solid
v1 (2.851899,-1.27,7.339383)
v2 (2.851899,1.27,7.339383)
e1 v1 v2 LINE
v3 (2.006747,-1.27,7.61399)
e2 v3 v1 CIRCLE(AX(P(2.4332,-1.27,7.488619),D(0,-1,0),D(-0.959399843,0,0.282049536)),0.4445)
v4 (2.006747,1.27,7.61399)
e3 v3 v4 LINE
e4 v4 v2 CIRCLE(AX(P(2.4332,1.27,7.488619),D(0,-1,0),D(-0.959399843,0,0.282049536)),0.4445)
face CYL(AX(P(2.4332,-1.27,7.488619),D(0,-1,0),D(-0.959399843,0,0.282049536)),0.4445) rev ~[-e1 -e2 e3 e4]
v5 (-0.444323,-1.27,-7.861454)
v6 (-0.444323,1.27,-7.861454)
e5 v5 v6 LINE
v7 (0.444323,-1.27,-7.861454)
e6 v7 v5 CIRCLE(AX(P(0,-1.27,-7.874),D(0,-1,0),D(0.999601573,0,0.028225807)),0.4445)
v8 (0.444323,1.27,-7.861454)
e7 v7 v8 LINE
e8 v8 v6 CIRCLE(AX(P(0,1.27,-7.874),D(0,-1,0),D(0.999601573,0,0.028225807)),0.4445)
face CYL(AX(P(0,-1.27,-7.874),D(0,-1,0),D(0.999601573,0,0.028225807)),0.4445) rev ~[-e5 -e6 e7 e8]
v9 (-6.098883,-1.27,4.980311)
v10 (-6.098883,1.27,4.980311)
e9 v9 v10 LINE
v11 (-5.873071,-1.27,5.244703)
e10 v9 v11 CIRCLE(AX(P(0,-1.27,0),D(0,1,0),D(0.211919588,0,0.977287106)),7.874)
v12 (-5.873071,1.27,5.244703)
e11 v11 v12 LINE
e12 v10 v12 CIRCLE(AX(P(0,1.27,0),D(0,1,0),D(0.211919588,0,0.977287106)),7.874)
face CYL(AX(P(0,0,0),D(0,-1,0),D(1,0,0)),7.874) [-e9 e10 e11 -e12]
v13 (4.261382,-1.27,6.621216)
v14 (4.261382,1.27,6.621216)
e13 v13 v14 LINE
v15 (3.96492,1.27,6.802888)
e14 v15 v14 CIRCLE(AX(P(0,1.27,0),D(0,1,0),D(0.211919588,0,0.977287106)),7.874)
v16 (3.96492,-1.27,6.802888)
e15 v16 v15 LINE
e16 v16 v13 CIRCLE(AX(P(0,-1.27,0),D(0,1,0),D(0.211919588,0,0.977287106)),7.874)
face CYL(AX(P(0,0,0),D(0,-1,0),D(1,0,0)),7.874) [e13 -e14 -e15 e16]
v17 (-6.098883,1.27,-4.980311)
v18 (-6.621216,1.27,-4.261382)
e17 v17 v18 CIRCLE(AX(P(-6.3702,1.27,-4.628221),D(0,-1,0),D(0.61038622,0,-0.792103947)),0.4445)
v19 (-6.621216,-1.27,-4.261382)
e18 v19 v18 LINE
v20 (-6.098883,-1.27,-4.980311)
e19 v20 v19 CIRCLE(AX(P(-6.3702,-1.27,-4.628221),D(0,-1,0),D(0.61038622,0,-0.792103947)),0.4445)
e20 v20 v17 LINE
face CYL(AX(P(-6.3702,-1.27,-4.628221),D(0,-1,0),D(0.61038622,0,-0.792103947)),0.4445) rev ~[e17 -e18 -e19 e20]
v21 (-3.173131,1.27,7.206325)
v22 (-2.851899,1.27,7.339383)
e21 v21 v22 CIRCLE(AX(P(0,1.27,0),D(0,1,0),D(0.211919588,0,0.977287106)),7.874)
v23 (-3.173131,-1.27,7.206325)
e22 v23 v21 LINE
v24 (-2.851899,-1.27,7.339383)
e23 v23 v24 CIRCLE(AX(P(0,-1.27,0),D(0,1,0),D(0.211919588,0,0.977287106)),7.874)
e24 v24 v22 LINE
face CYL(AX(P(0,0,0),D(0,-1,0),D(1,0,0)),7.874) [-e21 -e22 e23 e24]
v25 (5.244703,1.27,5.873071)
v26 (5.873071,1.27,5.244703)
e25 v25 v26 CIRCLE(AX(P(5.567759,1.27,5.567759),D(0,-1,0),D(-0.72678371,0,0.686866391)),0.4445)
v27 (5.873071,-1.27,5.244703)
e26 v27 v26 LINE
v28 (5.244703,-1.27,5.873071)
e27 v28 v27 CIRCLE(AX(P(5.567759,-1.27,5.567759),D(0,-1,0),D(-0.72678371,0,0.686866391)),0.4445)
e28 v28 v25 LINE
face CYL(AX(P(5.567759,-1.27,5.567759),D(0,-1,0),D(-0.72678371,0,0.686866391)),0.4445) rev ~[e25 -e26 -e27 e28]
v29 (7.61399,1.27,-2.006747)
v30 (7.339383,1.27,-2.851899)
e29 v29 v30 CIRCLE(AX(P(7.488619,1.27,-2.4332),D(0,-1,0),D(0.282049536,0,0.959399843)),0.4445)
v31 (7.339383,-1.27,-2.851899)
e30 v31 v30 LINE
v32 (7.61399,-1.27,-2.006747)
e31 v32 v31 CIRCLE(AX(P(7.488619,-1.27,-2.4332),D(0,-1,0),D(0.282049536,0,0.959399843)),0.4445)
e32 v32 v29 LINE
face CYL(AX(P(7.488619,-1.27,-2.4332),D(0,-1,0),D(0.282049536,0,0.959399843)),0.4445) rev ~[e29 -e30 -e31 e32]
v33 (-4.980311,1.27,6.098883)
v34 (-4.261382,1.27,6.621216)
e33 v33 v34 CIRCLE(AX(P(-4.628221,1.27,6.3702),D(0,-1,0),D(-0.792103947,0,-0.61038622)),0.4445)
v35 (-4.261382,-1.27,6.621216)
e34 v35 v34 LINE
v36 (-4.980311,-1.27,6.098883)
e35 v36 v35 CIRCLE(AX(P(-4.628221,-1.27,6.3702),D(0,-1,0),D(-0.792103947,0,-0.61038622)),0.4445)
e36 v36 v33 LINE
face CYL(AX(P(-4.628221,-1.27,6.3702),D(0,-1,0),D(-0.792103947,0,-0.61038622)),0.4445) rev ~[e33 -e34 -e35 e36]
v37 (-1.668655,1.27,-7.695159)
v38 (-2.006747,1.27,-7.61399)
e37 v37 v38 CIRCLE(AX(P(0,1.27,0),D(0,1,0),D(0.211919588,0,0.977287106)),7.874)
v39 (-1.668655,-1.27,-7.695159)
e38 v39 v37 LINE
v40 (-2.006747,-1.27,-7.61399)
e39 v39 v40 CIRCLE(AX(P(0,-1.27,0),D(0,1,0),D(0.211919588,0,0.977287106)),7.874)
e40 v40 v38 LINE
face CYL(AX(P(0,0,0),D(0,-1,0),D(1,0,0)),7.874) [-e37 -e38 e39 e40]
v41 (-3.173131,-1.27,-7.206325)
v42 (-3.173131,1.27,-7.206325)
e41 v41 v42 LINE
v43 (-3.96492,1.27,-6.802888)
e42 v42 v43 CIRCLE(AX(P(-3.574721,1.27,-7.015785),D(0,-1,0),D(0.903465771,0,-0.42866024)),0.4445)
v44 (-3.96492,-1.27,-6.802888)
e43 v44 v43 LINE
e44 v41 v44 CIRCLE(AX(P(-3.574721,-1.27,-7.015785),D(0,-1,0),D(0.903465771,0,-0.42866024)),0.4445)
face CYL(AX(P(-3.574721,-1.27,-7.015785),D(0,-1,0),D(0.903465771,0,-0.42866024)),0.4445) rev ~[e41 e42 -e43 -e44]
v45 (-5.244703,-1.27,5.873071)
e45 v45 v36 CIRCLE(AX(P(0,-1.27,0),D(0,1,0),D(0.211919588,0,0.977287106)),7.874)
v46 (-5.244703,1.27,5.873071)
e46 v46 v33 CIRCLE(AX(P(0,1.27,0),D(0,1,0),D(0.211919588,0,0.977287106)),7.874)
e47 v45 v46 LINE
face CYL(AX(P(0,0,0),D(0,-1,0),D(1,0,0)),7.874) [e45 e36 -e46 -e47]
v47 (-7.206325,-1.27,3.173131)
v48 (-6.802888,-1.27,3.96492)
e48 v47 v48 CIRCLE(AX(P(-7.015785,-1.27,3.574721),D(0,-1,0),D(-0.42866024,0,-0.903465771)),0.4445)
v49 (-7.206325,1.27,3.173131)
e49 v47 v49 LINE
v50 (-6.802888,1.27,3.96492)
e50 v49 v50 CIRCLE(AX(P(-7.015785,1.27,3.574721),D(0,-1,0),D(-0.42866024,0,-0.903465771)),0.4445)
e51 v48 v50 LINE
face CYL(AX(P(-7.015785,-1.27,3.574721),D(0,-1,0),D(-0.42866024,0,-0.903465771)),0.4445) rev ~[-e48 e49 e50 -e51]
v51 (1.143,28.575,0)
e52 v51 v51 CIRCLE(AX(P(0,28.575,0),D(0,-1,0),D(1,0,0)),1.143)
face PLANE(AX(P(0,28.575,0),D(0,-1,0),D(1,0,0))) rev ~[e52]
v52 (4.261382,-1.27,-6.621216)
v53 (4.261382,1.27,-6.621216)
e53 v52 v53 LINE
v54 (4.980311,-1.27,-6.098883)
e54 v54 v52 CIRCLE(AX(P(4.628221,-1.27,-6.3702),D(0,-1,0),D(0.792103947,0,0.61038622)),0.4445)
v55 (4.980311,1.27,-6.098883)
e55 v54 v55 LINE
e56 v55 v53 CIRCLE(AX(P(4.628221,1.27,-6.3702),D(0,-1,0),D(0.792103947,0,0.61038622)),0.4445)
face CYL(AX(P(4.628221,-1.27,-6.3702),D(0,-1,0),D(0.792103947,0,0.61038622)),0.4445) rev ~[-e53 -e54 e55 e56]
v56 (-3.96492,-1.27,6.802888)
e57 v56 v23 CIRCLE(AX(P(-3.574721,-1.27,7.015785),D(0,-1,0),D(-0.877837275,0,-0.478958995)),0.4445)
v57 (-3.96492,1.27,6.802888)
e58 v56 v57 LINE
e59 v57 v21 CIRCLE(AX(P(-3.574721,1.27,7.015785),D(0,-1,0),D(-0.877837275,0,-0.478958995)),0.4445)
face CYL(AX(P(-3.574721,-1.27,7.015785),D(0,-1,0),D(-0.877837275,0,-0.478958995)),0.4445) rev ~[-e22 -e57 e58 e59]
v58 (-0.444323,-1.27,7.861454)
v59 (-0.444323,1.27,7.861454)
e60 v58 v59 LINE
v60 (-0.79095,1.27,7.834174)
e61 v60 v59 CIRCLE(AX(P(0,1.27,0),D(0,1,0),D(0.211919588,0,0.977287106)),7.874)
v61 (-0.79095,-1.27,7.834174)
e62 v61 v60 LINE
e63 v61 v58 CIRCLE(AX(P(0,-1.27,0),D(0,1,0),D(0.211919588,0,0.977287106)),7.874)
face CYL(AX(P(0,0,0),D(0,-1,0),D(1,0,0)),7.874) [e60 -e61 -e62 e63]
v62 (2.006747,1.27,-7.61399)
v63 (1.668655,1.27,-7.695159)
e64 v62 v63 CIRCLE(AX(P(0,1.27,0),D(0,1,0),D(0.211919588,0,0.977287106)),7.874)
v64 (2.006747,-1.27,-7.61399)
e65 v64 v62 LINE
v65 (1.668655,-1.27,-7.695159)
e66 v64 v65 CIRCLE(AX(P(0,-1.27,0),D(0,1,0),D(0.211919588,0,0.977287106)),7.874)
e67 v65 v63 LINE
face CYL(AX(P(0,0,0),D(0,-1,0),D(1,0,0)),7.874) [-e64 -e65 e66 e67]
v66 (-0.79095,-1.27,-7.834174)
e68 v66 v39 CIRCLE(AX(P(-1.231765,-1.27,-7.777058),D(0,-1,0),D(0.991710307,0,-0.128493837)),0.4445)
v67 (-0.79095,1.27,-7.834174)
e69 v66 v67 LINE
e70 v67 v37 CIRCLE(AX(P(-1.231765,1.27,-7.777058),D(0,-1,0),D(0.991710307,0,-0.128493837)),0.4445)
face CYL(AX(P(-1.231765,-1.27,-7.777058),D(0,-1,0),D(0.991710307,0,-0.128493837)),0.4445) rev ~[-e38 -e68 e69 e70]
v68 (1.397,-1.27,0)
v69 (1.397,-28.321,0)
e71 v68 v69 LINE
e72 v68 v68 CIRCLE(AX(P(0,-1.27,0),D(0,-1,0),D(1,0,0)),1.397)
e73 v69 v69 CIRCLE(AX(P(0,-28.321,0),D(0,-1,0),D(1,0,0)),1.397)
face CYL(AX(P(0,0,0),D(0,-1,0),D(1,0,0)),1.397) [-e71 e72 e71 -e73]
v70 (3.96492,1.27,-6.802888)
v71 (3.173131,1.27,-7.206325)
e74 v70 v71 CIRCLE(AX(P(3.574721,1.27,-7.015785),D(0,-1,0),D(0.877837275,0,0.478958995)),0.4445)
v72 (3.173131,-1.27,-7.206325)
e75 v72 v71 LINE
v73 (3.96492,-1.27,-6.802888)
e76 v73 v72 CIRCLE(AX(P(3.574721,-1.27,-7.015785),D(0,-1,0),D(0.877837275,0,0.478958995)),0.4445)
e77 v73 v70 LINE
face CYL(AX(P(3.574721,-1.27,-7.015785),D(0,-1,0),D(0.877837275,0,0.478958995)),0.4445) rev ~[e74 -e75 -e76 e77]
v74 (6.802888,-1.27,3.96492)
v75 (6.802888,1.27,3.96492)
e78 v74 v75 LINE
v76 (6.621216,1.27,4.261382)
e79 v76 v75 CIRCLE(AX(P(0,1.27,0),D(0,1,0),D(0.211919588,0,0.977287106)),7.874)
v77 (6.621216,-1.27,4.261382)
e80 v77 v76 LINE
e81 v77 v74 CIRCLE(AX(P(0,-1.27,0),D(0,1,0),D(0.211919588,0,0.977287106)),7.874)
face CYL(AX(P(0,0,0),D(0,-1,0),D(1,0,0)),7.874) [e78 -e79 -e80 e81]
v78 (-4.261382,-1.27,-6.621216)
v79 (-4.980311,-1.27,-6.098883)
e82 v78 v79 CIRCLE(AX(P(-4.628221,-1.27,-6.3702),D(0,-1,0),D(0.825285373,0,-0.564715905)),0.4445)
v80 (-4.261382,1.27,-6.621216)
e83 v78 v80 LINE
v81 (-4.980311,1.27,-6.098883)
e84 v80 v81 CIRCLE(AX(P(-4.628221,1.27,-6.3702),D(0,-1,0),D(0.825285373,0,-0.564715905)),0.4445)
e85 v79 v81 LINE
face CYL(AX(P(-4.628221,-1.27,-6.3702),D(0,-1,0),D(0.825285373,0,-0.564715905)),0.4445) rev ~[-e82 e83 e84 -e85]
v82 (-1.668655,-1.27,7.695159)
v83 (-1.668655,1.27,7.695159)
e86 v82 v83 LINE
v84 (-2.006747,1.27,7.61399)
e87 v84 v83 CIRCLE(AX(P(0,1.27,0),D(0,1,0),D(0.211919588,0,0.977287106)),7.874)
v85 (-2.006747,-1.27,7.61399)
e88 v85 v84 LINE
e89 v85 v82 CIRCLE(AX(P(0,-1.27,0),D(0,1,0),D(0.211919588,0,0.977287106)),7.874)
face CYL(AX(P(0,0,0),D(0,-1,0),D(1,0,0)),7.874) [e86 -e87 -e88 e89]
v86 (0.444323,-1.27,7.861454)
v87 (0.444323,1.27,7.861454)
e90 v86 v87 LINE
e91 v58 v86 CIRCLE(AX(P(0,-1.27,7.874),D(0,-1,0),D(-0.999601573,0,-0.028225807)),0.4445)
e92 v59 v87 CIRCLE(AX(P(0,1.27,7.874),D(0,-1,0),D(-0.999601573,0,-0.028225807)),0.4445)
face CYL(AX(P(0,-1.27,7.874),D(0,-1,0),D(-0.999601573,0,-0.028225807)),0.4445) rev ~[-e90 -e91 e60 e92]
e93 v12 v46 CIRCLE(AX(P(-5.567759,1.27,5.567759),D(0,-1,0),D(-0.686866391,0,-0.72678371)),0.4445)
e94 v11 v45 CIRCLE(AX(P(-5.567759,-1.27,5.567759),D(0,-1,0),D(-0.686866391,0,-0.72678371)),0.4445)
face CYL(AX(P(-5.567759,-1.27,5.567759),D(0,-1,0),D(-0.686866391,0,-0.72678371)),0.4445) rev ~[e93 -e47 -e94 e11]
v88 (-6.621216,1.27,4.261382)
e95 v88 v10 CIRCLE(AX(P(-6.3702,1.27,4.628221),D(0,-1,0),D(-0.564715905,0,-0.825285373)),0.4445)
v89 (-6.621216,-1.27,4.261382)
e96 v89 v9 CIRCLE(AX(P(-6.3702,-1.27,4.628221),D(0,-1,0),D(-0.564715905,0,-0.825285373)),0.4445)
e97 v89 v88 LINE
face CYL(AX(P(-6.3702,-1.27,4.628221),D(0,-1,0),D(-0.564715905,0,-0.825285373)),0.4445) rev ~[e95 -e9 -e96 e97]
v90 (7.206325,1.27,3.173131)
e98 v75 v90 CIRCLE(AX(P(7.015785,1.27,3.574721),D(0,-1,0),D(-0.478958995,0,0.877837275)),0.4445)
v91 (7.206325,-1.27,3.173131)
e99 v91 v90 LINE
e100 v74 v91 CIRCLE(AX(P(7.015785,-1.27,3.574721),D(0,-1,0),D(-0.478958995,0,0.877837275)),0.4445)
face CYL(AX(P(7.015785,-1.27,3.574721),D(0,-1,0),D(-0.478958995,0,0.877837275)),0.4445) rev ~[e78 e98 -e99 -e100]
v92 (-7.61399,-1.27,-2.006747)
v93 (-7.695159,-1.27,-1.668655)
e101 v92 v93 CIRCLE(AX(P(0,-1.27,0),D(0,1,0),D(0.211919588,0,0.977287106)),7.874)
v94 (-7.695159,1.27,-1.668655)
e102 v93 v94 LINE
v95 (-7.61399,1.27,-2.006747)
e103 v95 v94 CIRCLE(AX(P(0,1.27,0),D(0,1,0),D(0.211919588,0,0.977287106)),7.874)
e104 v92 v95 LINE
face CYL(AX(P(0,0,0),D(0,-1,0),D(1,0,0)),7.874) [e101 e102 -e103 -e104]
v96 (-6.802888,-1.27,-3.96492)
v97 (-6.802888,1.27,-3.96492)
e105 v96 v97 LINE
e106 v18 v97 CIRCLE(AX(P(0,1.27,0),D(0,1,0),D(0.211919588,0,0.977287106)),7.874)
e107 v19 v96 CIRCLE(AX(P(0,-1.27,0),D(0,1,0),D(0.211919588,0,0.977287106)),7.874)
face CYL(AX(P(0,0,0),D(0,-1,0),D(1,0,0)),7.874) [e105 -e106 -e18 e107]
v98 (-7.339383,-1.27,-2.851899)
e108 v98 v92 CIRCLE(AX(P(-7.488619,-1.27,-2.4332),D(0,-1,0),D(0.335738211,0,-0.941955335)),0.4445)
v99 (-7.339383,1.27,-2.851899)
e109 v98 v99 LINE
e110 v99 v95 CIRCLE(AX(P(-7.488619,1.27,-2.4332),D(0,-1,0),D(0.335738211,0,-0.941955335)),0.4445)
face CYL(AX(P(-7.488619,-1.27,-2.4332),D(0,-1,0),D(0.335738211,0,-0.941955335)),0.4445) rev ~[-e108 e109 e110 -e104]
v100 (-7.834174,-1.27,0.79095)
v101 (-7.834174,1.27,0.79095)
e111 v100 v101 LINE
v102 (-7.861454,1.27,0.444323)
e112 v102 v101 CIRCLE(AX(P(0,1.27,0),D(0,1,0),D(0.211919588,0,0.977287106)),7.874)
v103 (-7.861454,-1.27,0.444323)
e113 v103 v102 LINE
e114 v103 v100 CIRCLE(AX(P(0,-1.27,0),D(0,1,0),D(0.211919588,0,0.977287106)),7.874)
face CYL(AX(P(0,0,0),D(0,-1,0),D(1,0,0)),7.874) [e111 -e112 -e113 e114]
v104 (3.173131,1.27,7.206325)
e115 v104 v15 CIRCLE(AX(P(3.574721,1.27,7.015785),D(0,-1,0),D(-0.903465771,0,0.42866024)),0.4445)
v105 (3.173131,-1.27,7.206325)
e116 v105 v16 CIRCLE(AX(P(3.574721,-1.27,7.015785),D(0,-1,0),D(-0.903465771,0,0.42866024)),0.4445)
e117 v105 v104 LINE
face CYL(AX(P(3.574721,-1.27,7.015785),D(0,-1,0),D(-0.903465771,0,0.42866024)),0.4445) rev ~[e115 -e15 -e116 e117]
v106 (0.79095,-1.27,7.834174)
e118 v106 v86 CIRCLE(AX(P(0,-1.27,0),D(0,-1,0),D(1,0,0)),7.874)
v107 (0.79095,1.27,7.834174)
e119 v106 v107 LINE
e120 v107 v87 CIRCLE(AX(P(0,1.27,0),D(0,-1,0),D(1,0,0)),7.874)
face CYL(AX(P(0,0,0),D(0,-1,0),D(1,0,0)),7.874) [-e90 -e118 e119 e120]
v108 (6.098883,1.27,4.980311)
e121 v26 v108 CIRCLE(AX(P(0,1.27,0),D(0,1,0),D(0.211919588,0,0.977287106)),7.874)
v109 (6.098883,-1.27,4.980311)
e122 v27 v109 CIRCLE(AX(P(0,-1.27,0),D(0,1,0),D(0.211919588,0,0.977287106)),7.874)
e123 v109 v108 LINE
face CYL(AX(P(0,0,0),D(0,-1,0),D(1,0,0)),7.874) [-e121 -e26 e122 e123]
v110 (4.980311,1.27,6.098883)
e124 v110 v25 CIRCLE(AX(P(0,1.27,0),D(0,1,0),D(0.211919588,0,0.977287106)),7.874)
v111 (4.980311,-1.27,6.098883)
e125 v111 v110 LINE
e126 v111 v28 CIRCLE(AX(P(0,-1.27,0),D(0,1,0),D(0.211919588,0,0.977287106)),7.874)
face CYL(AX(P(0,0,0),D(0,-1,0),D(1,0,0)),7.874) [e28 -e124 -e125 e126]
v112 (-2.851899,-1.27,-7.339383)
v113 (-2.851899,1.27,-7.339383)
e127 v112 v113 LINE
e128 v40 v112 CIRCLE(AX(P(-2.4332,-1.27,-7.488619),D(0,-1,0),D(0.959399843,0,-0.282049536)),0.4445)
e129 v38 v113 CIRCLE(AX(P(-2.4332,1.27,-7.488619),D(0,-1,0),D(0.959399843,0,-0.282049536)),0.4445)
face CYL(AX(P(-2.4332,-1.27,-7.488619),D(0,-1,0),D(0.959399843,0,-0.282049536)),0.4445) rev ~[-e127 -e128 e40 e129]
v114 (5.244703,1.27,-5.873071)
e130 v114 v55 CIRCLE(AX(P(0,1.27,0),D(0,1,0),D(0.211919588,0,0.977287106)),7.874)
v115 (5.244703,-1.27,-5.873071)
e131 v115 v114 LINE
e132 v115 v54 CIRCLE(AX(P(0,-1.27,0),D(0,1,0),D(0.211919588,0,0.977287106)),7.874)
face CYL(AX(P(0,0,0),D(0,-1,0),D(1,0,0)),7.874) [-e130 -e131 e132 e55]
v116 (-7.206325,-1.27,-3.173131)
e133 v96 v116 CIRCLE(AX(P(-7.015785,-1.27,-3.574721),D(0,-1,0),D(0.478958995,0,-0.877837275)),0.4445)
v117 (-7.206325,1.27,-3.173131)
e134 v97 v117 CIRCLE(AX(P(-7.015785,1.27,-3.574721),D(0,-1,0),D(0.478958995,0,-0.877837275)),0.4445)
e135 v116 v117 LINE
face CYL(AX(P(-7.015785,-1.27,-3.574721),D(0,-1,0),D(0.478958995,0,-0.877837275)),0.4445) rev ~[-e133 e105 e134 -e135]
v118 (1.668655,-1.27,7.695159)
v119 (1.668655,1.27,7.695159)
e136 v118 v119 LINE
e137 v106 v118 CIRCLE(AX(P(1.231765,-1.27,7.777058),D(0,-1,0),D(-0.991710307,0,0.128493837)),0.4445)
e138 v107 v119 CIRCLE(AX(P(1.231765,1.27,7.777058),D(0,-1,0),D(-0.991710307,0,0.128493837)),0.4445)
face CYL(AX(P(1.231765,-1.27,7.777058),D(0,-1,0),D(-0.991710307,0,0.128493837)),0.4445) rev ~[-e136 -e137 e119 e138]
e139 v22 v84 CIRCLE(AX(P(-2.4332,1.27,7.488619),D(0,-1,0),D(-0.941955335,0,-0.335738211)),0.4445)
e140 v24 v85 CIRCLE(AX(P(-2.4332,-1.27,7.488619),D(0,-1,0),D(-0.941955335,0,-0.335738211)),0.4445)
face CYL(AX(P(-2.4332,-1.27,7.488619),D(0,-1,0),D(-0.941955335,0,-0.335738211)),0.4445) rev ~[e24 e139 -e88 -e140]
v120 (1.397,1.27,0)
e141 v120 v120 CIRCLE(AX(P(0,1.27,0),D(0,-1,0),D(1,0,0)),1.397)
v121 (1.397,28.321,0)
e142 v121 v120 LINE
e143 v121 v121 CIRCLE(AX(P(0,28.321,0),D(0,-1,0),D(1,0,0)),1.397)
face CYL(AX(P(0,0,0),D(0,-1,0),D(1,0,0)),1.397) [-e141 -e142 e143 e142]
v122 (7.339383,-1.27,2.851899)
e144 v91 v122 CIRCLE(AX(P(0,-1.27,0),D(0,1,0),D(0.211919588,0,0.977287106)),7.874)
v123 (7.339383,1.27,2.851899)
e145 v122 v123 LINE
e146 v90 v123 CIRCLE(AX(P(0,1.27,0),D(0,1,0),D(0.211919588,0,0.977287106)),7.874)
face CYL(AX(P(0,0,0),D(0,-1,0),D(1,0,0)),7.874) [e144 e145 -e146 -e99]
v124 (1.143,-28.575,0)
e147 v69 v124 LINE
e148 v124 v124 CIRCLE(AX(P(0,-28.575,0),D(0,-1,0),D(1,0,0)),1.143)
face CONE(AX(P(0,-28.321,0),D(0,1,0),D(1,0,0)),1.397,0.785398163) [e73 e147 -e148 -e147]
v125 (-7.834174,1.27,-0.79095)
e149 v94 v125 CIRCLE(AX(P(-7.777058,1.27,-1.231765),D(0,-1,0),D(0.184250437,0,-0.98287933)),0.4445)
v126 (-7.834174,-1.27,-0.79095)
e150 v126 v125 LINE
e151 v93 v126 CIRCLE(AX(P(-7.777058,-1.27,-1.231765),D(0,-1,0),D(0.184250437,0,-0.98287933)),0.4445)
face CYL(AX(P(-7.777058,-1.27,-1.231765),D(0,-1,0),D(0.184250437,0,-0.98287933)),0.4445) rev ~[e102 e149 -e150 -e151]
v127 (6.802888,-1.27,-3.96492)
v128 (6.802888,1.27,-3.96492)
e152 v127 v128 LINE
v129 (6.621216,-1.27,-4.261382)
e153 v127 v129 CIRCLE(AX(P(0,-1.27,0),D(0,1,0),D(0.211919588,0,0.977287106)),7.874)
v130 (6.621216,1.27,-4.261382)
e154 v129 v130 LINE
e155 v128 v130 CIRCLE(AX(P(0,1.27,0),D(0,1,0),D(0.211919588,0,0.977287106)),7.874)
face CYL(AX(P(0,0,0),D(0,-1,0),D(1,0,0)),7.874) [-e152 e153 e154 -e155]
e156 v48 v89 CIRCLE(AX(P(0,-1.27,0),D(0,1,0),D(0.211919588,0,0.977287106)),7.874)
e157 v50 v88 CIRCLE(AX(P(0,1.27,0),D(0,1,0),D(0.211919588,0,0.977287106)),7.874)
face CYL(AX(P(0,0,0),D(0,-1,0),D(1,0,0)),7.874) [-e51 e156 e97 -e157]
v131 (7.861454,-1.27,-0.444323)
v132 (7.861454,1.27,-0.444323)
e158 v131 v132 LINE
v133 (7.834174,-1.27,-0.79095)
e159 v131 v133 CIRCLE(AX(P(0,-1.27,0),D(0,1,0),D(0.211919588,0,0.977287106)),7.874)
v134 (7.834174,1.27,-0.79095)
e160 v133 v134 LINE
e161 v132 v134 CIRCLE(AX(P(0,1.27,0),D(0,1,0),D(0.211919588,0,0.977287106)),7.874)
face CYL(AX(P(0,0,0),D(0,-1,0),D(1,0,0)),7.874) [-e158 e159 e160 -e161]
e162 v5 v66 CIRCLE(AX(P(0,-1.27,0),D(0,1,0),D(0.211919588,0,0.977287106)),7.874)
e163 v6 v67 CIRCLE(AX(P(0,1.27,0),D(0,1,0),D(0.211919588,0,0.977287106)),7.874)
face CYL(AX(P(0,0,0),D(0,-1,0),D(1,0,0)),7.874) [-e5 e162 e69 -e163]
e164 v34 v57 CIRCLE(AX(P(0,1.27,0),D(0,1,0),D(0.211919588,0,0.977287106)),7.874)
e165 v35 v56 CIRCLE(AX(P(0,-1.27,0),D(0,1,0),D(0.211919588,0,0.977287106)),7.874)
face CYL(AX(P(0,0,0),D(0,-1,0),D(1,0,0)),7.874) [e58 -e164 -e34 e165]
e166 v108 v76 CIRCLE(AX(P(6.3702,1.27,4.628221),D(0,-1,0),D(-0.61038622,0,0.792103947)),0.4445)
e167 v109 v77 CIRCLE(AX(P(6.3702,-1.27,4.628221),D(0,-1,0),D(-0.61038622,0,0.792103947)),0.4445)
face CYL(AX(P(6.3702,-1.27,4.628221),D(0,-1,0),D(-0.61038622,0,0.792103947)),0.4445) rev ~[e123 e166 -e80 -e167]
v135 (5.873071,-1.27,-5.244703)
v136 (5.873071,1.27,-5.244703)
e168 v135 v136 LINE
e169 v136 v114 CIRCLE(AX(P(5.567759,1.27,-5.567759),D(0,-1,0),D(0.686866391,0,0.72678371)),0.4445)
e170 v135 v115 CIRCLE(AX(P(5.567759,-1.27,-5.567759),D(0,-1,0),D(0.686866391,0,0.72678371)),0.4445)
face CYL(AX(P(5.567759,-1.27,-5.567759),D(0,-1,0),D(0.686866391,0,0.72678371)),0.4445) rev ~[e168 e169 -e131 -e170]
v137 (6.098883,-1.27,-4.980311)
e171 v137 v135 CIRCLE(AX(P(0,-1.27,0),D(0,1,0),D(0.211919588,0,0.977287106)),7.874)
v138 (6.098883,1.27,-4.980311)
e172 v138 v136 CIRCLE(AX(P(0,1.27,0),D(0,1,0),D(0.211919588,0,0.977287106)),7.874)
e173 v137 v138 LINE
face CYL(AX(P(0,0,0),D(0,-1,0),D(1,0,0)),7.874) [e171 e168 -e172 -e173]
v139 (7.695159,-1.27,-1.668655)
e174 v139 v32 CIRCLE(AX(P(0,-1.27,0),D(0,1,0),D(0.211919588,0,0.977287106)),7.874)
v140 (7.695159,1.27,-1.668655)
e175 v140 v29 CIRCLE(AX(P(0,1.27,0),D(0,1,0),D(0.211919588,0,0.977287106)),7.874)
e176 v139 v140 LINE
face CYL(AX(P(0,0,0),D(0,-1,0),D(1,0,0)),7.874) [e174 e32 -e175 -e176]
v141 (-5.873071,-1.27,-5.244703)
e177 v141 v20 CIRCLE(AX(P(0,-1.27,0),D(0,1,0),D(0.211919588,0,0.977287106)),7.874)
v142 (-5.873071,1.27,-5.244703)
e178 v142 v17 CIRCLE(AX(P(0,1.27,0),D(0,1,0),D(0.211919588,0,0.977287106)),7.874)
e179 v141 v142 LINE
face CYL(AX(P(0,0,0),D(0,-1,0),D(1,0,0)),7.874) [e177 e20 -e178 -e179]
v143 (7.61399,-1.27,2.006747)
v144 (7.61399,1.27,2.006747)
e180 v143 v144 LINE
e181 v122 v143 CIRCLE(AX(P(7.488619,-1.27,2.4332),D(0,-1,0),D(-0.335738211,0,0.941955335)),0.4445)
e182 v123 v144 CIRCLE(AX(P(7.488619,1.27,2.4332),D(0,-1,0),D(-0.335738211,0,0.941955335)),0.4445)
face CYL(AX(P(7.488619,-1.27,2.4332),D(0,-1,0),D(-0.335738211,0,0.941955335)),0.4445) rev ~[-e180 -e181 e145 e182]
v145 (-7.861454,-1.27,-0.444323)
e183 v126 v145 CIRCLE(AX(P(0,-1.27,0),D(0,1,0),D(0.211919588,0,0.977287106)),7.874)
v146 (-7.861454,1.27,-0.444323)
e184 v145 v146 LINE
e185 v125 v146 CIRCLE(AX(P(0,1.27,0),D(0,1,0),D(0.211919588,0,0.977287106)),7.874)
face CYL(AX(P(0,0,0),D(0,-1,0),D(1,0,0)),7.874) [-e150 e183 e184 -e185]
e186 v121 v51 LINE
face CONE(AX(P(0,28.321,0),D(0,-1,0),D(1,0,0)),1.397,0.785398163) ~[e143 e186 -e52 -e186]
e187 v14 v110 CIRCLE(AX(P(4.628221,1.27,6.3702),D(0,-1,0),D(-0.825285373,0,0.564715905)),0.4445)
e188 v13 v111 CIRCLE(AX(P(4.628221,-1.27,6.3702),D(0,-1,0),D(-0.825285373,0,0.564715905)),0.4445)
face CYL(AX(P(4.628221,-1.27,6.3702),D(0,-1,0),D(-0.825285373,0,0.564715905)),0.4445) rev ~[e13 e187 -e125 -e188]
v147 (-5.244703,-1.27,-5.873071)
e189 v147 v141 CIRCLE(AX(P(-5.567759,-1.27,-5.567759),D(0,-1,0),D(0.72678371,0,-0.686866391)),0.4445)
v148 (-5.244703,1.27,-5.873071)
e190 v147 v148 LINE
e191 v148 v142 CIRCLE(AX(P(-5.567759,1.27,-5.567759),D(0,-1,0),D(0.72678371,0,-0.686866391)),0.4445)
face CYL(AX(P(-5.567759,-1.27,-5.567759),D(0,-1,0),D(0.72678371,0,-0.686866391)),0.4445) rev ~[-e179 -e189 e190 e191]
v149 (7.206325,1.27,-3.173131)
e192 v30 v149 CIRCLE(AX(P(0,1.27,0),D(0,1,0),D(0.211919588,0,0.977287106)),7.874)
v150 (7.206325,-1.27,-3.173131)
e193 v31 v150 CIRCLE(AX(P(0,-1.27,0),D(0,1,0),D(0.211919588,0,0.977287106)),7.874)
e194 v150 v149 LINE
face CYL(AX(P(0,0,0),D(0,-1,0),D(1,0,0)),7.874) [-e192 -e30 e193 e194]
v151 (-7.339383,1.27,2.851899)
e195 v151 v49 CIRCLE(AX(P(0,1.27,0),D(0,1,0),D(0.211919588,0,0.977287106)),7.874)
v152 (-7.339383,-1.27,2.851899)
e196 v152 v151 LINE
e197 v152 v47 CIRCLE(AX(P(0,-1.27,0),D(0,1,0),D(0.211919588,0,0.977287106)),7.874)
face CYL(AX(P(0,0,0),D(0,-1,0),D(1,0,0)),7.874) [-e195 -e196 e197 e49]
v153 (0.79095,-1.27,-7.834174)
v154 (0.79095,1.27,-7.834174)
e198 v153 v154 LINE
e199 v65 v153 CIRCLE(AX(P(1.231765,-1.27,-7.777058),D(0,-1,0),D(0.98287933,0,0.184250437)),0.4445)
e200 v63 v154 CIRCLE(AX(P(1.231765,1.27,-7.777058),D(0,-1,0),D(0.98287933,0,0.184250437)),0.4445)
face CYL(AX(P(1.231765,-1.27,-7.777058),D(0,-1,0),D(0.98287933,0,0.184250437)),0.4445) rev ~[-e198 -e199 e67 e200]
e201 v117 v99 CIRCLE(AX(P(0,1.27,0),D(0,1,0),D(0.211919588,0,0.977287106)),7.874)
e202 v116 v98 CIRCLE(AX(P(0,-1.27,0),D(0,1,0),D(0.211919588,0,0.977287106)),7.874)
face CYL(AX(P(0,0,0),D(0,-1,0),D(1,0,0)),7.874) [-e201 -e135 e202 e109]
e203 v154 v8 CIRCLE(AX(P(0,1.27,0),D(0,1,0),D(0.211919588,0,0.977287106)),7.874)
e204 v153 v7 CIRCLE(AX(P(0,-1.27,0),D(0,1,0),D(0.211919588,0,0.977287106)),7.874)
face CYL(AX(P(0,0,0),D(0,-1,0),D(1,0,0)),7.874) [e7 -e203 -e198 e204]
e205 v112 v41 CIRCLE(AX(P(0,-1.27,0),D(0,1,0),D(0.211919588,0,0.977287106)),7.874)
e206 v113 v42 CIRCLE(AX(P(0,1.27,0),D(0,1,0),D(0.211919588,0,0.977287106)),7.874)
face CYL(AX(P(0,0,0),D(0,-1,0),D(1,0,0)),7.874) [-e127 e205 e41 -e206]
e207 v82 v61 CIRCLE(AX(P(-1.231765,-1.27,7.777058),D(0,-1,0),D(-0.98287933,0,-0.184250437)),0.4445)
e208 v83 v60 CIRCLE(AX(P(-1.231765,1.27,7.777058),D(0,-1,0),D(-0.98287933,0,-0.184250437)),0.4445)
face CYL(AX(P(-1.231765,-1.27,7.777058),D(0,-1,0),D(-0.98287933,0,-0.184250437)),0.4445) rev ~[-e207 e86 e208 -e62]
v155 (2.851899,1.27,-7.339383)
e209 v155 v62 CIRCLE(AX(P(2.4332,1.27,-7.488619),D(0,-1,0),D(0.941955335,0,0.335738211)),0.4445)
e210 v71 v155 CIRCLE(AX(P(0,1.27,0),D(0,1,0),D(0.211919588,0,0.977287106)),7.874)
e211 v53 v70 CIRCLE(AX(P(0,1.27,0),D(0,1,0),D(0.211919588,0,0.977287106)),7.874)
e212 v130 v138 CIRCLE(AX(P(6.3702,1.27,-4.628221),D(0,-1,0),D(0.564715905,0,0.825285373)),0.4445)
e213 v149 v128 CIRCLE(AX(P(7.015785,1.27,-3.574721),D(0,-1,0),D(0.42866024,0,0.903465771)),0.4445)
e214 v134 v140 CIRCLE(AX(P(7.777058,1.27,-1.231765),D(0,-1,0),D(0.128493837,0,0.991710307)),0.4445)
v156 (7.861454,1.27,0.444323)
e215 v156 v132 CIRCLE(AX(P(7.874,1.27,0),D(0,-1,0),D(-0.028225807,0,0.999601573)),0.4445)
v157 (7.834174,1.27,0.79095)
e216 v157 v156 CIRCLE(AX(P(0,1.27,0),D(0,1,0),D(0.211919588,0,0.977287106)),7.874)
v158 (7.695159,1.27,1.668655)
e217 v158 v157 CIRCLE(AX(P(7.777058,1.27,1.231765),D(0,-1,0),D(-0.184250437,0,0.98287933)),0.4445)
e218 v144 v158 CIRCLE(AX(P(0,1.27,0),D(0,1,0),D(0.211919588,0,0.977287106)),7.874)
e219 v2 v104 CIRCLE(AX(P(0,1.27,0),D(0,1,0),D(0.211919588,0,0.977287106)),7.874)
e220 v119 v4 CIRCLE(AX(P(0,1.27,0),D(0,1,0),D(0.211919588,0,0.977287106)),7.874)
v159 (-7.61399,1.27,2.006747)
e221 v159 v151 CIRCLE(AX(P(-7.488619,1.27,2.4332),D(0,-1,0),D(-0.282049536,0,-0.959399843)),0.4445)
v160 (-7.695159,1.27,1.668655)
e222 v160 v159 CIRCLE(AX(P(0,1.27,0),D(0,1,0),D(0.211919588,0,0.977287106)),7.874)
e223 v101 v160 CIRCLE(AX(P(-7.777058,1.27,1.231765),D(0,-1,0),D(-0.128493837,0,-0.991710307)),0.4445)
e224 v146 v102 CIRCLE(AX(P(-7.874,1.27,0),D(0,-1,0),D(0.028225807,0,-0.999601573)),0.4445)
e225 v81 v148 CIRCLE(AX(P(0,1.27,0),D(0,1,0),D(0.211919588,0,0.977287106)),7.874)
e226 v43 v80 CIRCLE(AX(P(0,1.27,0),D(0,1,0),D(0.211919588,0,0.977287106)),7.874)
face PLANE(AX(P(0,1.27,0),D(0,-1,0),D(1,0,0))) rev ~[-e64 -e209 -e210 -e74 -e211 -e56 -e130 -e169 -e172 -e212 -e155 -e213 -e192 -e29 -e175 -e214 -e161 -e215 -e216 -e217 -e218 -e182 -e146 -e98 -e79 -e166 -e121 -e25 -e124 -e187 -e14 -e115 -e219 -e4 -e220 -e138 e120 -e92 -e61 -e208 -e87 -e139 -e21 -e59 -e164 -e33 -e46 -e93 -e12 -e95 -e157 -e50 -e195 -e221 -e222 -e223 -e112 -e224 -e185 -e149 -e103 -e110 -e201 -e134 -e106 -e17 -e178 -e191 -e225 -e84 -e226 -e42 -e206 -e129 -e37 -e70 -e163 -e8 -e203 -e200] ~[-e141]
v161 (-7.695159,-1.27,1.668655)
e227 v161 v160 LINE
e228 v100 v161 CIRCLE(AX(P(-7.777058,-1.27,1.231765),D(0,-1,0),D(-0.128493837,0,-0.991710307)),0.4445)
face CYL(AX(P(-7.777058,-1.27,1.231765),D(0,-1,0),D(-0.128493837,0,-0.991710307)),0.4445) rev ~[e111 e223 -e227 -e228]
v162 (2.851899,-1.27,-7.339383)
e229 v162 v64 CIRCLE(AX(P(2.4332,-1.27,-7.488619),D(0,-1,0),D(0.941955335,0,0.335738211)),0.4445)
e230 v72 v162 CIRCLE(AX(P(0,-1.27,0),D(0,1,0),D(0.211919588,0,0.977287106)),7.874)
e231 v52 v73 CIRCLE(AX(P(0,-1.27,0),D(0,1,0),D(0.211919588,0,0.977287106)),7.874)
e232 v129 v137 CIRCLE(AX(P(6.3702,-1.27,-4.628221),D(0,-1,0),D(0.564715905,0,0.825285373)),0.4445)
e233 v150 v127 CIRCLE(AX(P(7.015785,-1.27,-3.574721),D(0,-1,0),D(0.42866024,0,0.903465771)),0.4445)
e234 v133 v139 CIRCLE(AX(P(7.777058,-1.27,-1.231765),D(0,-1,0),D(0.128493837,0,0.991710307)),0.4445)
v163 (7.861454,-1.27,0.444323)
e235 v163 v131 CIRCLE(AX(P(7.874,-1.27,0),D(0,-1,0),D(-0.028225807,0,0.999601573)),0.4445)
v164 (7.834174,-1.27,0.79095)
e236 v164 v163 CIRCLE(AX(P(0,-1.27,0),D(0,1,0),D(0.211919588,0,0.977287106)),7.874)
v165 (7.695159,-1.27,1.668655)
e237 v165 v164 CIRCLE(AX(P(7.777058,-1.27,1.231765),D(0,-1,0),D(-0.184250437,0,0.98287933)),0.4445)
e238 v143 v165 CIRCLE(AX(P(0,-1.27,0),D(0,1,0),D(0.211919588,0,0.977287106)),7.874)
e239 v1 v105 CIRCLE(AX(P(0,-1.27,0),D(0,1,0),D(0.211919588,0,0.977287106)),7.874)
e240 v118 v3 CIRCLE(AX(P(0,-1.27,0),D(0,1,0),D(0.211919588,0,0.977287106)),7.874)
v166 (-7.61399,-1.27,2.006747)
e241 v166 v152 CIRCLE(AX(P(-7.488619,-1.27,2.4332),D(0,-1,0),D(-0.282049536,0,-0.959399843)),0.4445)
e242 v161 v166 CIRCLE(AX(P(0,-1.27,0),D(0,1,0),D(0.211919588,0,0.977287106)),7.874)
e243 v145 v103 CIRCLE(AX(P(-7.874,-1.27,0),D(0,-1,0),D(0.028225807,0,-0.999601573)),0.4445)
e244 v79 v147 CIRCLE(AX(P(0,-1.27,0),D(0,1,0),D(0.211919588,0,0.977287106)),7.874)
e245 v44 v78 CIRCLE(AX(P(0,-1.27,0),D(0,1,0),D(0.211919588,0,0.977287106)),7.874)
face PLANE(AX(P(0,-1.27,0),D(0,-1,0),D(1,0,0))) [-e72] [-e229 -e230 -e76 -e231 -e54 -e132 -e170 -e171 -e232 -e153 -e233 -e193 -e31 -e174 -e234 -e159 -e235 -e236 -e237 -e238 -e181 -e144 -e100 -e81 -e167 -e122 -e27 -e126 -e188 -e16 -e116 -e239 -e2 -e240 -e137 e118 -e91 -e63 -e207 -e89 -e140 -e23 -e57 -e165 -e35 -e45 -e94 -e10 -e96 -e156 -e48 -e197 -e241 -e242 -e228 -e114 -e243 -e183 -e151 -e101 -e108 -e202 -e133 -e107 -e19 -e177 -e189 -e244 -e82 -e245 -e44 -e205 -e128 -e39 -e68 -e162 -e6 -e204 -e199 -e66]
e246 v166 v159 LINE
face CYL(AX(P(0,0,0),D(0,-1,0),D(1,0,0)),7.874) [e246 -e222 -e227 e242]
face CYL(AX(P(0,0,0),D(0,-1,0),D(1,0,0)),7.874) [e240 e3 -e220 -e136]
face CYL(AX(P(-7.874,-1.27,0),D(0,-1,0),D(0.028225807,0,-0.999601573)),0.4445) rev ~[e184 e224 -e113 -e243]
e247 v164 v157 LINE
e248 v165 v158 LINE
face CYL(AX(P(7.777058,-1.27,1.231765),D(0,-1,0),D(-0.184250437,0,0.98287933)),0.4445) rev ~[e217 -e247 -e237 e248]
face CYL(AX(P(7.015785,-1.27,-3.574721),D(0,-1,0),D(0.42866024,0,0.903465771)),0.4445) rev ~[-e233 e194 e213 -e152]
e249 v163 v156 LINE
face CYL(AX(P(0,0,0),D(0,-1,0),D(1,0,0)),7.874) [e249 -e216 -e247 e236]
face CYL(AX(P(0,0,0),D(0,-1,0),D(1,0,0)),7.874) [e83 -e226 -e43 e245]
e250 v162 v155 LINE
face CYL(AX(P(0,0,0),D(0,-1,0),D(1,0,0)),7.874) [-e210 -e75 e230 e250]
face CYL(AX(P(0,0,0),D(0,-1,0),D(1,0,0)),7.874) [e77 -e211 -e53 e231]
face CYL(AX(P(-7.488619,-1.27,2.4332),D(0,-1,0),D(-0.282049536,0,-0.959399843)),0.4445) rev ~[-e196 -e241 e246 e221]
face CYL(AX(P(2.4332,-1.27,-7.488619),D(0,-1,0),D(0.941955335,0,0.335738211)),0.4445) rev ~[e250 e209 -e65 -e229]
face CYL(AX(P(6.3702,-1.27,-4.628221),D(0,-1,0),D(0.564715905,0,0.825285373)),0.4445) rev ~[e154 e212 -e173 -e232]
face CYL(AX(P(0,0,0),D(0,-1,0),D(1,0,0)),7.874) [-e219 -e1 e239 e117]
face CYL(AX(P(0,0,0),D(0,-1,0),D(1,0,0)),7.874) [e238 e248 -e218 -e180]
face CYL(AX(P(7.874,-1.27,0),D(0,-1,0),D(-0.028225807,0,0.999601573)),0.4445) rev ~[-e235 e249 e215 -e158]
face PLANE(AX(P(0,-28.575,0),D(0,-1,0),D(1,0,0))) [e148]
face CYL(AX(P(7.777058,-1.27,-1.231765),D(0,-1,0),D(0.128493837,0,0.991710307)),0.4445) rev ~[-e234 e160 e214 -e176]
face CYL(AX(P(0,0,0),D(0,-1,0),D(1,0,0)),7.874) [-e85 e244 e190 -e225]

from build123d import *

# Parameters (mm, degrees)
F0_R            = 7.874
F0_R_2          = 6.985
F0_R_3          = 1.397
F1_DEPTH        = 1.27
F2_DEPTH        = 28.575
F4_DEPTH        = 25.4
F4_COPIES_COUNT = 40
F5_SIZE         = 0.254


# Not quite as in the source:
# - a pattern or mirror of a feature is missing from the dataset's text; its kind, count and spacing are read off the source's solid


with BuildPart() as f1:
    # F0 (on Front) → F1 (new body, symmetric)
    with BuildSketch(Plane.XZ):
        Circle(F0_R)
        Circle(F0_R_2, mode=Mode.SUBTRACT)
        Circle(F0_R_2)
        Circle(F0_R_3, mode=Mode.SUBTRACT)
    extrude(amount=F1_DEPTH, both=True)

    # F0 (on Front) → F2 (join, symmetric)
    with BuildSketch(Plane.XZ):
        Circle(F0_R_3)
    extrude(amount=F2_DEPTH, both=True)

    # F3 (on face) → F4 (cut)
    with BuildSketch(Plane.XZ.offset(1.27)):
        with BuildLine():
            ThreePointArc((0.444322899, 7.861453629), (0, 7.874), (-0.444322899, 7.861453629))
            ThreePointArc((-0.444322899, 7.861453629), (0, 7.4295), (0.444322899, 7.861453629))
        make_face()
    f4 = extrude(amount=-F4_DEPTH, mode=Mode.SUBTRACT)

    # F4_copies: F4 ×40 about axis
    f4_copies_axis = Axis((0, 0, 0), (0, 1, 0))
    for i in range(1, F4_COPIES_COUNT):
        add(f4.rotate(f4_copies_axis, i * 360 / F4_COPIES_COUNT), mode=Mode.SUBTRACT)

    # F5
    f5_edges = [f1.edges().sort_by_distance(p)[0] for p in [
        (-1.397, -28.575, 0),
        (-1.397, 28.575, 0),
    ]]
    chamfer(f5_edges, length=F5_SIZE)


solid = f1.part
